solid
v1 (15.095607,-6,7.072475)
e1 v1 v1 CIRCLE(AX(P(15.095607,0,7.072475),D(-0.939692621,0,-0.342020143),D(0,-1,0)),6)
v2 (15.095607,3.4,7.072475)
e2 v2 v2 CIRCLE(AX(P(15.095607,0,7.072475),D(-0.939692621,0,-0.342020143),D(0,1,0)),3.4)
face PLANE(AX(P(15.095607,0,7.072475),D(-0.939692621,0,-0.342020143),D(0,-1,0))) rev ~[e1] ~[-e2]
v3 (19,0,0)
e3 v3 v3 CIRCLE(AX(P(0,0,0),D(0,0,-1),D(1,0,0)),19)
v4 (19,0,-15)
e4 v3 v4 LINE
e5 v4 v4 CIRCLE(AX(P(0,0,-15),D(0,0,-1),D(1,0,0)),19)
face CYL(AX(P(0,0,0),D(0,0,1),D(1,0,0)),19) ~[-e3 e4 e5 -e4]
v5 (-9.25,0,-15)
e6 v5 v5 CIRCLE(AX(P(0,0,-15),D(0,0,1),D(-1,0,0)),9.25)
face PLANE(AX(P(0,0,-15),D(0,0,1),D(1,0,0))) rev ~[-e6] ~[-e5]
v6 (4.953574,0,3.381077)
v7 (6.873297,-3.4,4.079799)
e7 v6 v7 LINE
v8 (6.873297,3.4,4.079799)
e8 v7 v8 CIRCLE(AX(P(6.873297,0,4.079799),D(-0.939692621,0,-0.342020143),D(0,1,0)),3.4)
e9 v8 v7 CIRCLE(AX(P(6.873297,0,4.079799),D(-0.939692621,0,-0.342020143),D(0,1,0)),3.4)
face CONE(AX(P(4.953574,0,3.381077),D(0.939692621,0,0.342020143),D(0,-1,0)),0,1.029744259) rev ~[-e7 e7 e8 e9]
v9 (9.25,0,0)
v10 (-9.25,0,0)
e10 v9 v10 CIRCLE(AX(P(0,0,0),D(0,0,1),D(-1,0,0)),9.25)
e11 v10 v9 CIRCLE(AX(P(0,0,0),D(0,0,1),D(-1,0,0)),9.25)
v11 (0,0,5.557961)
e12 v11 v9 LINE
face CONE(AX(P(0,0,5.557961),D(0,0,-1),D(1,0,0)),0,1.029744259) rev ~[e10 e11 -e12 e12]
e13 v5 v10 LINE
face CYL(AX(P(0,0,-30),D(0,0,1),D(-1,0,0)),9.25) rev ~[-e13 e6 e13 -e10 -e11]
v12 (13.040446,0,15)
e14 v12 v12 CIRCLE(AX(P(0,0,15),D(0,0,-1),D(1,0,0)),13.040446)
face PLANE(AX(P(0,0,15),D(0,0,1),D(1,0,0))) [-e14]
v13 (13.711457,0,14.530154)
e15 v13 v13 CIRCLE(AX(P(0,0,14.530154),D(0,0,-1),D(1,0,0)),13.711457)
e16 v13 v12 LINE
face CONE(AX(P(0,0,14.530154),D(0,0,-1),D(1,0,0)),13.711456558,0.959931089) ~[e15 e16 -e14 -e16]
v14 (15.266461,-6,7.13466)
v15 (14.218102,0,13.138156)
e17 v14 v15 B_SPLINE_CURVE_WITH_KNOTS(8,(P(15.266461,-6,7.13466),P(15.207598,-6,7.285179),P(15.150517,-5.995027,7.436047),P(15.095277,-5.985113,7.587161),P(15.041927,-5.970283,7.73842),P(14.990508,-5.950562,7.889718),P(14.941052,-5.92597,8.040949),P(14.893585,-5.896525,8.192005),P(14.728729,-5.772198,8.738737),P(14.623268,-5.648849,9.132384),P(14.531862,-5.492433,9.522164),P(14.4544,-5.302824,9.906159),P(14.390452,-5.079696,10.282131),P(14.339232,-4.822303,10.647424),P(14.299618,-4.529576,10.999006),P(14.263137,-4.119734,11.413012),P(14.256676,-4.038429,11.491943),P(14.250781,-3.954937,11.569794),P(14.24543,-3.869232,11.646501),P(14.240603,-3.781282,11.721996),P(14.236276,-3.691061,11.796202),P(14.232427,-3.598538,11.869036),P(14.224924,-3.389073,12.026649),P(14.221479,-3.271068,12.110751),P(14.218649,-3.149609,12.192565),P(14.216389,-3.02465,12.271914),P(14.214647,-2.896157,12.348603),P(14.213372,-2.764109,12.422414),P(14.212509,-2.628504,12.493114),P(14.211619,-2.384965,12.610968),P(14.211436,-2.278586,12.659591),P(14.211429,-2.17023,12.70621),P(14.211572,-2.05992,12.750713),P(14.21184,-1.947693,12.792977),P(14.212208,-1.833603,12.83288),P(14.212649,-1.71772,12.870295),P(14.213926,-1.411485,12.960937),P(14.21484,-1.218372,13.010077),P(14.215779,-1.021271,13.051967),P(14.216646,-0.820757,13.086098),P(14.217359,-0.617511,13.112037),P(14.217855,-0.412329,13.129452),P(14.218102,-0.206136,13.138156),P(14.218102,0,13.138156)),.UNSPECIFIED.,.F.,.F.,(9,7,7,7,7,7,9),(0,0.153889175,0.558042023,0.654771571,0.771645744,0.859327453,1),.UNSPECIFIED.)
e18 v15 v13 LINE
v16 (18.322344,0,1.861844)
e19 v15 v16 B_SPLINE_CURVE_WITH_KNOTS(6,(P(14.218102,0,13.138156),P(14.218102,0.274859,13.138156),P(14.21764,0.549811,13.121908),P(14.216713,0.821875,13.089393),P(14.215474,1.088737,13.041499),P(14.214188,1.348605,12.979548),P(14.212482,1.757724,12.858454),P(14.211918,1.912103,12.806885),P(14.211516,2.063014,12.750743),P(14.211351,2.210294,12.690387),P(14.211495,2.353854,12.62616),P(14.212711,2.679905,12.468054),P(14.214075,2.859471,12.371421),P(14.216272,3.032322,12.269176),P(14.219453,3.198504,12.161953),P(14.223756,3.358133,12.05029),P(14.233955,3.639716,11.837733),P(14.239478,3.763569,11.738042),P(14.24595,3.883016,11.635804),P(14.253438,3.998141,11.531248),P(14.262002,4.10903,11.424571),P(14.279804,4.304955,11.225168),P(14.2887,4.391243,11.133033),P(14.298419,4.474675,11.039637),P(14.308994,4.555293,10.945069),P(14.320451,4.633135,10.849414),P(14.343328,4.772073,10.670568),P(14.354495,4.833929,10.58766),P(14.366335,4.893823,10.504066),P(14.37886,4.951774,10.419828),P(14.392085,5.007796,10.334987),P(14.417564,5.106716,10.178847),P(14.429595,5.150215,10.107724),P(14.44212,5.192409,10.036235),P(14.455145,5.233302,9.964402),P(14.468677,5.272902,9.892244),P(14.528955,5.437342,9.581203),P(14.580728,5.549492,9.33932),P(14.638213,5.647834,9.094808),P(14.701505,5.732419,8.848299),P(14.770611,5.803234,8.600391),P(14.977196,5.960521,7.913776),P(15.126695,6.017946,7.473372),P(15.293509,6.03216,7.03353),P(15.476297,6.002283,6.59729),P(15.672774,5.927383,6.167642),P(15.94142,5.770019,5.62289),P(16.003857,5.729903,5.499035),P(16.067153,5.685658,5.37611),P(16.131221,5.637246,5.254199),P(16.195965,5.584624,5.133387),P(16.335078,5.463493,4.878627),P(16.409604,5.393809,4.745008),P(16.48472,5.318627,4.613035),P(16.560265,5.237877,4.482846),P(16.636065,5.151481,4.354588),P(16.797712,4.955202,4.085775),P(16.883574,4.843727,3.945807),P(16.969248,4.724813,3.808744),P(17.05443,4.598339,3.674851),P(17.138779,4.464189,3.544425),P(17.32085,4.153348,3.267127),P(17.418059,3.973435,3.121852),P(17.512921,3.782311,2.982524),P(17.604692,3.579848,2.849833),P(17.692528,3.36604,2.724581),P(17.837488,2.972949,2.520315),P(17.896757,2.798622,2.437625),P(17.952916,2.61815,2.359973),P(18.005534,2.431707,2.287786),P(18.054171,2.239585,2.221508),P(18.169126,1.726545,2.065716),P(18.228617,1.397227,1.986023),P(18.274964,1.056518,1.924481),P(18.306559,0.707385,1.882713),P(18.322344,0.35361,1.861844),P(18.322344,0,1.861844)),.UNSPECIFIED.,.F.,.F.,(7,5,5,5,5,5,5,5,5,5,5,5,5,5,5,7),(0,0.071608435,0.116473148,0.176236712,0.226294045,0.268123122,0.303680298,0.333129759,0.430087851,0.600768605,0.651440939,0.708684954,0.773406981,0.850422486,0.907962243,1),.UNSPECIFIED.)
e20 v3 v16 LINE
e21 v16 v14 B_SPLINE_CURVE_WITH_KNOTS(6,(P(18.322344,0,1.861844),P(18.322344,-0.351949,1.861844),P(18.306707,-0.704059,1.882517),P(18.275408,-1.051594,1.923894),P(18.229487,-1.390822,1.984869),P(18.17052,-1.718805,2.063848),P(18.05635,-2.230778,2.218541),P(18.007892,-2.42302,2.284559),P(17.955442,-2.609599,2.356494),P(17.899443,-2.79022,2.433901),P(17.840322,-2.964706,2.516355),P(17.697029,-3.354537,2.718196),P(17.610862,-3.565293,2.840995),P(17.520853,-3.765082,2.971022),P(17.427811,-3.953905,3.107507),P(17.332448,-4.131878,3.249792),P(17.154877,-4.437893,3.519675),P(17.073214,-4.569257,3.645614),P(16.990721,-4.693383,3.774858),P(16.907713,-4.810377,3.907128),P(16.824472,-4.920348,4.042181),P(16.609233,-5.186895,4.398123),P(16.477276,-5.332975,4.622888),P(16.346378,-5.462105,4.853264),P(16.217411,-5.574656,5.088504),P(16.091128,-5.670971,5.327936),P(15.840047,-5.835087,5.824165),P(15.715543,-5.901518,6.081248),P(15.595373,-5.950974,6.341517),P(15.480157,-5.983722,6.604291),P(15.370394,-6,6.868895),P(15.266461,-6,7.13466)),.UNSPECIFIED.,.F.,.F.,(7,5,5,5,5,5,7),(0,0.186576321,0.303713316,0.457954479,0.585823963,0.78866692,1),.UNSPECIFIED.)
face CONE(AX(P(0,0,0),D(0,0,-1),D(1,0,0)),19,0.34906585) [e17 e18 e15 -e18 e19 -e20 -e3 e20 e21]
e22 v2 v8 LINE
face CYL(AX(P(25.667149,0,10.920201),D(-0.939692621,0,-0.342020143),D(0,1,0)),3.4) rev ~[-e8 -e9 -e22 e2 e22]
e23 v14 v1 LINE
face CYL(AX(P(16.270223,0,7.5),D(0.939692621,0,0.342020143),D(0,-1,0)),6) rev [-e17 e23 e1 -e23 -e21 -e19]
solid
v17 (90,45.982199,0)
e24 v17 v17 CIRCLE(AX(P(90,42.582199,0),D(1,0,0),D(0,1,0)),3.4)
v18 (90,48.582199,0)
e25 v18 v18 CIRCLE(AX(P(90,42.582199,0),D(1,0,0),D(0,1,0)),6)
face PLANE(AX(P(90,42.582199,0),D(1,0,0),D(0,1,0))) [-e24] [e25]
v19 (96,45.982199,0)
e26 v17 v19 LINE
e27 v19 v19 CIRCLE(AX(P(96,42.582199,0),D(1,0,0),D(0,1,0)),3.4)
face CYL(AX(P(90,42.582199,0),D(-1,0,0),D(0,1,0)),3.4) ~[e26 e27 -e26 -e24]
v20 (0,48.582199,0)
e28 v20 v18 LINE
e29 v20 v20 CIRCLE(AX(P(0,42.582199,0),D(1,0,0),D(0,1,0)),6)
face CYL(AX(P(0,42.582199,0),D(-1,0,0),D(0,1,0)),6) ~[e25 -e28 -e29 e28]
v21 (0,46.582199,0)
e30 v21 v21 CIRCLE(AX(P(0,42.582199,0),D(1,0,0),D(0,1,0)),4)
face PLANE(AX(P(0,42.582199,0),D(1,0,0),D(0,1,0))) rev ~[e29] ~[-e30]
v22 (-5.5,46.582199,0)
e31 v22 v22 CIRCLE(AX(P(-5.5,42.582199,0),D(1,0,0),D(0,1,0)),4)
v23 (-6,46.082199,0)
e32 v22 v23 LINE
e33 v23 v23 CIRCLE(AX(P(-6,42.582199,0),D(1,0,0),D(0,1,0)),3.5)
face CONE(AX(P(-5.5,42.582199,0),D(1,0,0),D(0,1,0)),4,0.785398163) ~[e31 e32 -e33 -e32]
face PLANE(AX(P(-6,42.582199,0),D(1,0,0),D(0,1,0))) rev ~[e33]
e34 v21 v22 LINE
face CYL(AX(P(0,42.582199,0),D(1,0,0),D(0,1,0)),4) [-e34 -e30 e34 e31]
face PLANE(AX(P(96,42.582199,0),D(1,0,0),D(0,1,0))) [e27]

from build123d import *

# Parameters (mm, degrees)
F0_R       = 19
F1_DEPTH   = 15
F1_TAPER   = 20
F2_DEPTH   = 15
F6_R       = 6
F7_DEPTH   = 1.25
F8_D       = 6.8
F8_DEPTH   = 10
F8_TIP     = 2.0429261047
F10_D      = 18.5
F10_DEPTH  = 15
F10_TIP    = 5.557960726
F11_R      = 4
F12_DEPTH  = 6
F11_R_2    = 6
F12_FACE_R = 4
F13_DEPTH  = 90
F14_SIZE   = 0.5
F15_R      = 3.4
F16_DEPTH  = 6


# Not quite as in the source:
# - a fillet or chamfer that OpenCascade refuses, or shapes differently, is made with other operations: its cross-section is extruded or revolved along the edge and cut away or added
# - the program builds the solid bodies; features that only make, move or delete a surface that nothing else refers to are left out


with BuildPart() as f1:
    # F0 (on Top) → F1 (new body)
    with BuildSketch(Plane.XY):
        Circle(F0_R)
    extrude(amount=F1_DEPTH, taper=F1_TAPER)

    # F2 (add): a face of the model
    f2_faces = [f1.faces().sort_by_distance(p)[0] for p in [
        (0, 0, 0),
    ]]
    extrude(f2_faces, amount=F2_DEPTH)

    # F4: chamfer of 0.5 on 1 edges, made by hand

    # F4_s1 → F4_t2 (revolve, cut)
    with BuildSketch(Plane.XZ):
        Polygon((13.7114565577, 14.5301536896), (13.040446486, 15), (13.540446486, 15), align=None)
    revolve(axis=Axis((0, 0, 15), (0, 0, -1)), mode=Mode.SUBTRACT)

    # F6 (on line) → F7 (cut)
    with BuildSketch(Plane(origin=(16.7774222096, 0, 6.106482292), x_dir=(0, -1, 0), z_dir=(-0.9396926208, 0, -0.3420201433))):
        with Locations((0, 1.4829505704)):
            Circle(F6_R)
    extrude(amount=F7_DEPTH, mode=Mode.SUBTRACT)

    # F8
    with Locations(Plane(origin=(16.7774222096, 0, 6.106482292), x_dir=(0, -1, 0), z_dir=(0.9396926208, 0, 0.3420201433))):
        with Locations((0, -1.4829505704)):
            Hole(F8_D / 2, depth=F8_DEPTH)
            with Locations((0, 0, -(F8_DEPTH + F8_TIP / 2))):  # 118° drill point
                Cone(0, F8_D / 2, F8_TIP, mode=Mode.SUBTRACT)

    # F10
    with Locations(Plane(origin=(0, 0, -15), x_dir=(1, 0, 0), z_dir=(0, 0, -1))):
        with Locations((0, 0)):
            Hole(F10_D / 2, depth=F10_DEPTH)
            with Locations((0, 0, -(F10_DEPTH + F10_TIP / 2))):  # 118° drill point
                Cone(0, F10_D / 2, F10_TIP, mode=Mode.SUBTRACT)


with BuildPart() as f12:
    # F11 (on Right) → F12 (new body)
    with BuildSketch(Plane.YZ):
        with Locations((42.5821989775, 0)):
            Circle(F11_R)
    extrude(amount=-F12_DEPTH)

    # F11 (on Right) + F12_face (on face) → F13 (join)
    with BuildSketch(Plane.YZ):
        with Locations((42.5821989775, 0)):
            Circle(F11_R_2)
        with Locations((42.5821989775, 0)):
            Circle(F11_R, mode=Mode.SUBTRACT)
    with BuildSketch(Plane(origin=(0, 42.5821989775, 0), x_dir=(0, 1, 0), z_dir=(1, 0, 0))):
        Circle(F12_FACE_R)
    extrude(amount=F13_DEPTH)

    # F14
    f14_edges = [f12.edges().sort_by_distance(p)[0] for p in [
        (-6, 38.582199, 0),
    ]]
    chamfer(f14_edges, length=F14_SIZE)

    # F15 (on face) → F16 (join)
    with BuildSketch(Plane.YZ.offset(90)):
        with Locations((42.5821989775, 0)):
            Circle(F15_R)
    extrude(amount=F16_DEPTH)


solid = Compound([f1.part, f12.part])
